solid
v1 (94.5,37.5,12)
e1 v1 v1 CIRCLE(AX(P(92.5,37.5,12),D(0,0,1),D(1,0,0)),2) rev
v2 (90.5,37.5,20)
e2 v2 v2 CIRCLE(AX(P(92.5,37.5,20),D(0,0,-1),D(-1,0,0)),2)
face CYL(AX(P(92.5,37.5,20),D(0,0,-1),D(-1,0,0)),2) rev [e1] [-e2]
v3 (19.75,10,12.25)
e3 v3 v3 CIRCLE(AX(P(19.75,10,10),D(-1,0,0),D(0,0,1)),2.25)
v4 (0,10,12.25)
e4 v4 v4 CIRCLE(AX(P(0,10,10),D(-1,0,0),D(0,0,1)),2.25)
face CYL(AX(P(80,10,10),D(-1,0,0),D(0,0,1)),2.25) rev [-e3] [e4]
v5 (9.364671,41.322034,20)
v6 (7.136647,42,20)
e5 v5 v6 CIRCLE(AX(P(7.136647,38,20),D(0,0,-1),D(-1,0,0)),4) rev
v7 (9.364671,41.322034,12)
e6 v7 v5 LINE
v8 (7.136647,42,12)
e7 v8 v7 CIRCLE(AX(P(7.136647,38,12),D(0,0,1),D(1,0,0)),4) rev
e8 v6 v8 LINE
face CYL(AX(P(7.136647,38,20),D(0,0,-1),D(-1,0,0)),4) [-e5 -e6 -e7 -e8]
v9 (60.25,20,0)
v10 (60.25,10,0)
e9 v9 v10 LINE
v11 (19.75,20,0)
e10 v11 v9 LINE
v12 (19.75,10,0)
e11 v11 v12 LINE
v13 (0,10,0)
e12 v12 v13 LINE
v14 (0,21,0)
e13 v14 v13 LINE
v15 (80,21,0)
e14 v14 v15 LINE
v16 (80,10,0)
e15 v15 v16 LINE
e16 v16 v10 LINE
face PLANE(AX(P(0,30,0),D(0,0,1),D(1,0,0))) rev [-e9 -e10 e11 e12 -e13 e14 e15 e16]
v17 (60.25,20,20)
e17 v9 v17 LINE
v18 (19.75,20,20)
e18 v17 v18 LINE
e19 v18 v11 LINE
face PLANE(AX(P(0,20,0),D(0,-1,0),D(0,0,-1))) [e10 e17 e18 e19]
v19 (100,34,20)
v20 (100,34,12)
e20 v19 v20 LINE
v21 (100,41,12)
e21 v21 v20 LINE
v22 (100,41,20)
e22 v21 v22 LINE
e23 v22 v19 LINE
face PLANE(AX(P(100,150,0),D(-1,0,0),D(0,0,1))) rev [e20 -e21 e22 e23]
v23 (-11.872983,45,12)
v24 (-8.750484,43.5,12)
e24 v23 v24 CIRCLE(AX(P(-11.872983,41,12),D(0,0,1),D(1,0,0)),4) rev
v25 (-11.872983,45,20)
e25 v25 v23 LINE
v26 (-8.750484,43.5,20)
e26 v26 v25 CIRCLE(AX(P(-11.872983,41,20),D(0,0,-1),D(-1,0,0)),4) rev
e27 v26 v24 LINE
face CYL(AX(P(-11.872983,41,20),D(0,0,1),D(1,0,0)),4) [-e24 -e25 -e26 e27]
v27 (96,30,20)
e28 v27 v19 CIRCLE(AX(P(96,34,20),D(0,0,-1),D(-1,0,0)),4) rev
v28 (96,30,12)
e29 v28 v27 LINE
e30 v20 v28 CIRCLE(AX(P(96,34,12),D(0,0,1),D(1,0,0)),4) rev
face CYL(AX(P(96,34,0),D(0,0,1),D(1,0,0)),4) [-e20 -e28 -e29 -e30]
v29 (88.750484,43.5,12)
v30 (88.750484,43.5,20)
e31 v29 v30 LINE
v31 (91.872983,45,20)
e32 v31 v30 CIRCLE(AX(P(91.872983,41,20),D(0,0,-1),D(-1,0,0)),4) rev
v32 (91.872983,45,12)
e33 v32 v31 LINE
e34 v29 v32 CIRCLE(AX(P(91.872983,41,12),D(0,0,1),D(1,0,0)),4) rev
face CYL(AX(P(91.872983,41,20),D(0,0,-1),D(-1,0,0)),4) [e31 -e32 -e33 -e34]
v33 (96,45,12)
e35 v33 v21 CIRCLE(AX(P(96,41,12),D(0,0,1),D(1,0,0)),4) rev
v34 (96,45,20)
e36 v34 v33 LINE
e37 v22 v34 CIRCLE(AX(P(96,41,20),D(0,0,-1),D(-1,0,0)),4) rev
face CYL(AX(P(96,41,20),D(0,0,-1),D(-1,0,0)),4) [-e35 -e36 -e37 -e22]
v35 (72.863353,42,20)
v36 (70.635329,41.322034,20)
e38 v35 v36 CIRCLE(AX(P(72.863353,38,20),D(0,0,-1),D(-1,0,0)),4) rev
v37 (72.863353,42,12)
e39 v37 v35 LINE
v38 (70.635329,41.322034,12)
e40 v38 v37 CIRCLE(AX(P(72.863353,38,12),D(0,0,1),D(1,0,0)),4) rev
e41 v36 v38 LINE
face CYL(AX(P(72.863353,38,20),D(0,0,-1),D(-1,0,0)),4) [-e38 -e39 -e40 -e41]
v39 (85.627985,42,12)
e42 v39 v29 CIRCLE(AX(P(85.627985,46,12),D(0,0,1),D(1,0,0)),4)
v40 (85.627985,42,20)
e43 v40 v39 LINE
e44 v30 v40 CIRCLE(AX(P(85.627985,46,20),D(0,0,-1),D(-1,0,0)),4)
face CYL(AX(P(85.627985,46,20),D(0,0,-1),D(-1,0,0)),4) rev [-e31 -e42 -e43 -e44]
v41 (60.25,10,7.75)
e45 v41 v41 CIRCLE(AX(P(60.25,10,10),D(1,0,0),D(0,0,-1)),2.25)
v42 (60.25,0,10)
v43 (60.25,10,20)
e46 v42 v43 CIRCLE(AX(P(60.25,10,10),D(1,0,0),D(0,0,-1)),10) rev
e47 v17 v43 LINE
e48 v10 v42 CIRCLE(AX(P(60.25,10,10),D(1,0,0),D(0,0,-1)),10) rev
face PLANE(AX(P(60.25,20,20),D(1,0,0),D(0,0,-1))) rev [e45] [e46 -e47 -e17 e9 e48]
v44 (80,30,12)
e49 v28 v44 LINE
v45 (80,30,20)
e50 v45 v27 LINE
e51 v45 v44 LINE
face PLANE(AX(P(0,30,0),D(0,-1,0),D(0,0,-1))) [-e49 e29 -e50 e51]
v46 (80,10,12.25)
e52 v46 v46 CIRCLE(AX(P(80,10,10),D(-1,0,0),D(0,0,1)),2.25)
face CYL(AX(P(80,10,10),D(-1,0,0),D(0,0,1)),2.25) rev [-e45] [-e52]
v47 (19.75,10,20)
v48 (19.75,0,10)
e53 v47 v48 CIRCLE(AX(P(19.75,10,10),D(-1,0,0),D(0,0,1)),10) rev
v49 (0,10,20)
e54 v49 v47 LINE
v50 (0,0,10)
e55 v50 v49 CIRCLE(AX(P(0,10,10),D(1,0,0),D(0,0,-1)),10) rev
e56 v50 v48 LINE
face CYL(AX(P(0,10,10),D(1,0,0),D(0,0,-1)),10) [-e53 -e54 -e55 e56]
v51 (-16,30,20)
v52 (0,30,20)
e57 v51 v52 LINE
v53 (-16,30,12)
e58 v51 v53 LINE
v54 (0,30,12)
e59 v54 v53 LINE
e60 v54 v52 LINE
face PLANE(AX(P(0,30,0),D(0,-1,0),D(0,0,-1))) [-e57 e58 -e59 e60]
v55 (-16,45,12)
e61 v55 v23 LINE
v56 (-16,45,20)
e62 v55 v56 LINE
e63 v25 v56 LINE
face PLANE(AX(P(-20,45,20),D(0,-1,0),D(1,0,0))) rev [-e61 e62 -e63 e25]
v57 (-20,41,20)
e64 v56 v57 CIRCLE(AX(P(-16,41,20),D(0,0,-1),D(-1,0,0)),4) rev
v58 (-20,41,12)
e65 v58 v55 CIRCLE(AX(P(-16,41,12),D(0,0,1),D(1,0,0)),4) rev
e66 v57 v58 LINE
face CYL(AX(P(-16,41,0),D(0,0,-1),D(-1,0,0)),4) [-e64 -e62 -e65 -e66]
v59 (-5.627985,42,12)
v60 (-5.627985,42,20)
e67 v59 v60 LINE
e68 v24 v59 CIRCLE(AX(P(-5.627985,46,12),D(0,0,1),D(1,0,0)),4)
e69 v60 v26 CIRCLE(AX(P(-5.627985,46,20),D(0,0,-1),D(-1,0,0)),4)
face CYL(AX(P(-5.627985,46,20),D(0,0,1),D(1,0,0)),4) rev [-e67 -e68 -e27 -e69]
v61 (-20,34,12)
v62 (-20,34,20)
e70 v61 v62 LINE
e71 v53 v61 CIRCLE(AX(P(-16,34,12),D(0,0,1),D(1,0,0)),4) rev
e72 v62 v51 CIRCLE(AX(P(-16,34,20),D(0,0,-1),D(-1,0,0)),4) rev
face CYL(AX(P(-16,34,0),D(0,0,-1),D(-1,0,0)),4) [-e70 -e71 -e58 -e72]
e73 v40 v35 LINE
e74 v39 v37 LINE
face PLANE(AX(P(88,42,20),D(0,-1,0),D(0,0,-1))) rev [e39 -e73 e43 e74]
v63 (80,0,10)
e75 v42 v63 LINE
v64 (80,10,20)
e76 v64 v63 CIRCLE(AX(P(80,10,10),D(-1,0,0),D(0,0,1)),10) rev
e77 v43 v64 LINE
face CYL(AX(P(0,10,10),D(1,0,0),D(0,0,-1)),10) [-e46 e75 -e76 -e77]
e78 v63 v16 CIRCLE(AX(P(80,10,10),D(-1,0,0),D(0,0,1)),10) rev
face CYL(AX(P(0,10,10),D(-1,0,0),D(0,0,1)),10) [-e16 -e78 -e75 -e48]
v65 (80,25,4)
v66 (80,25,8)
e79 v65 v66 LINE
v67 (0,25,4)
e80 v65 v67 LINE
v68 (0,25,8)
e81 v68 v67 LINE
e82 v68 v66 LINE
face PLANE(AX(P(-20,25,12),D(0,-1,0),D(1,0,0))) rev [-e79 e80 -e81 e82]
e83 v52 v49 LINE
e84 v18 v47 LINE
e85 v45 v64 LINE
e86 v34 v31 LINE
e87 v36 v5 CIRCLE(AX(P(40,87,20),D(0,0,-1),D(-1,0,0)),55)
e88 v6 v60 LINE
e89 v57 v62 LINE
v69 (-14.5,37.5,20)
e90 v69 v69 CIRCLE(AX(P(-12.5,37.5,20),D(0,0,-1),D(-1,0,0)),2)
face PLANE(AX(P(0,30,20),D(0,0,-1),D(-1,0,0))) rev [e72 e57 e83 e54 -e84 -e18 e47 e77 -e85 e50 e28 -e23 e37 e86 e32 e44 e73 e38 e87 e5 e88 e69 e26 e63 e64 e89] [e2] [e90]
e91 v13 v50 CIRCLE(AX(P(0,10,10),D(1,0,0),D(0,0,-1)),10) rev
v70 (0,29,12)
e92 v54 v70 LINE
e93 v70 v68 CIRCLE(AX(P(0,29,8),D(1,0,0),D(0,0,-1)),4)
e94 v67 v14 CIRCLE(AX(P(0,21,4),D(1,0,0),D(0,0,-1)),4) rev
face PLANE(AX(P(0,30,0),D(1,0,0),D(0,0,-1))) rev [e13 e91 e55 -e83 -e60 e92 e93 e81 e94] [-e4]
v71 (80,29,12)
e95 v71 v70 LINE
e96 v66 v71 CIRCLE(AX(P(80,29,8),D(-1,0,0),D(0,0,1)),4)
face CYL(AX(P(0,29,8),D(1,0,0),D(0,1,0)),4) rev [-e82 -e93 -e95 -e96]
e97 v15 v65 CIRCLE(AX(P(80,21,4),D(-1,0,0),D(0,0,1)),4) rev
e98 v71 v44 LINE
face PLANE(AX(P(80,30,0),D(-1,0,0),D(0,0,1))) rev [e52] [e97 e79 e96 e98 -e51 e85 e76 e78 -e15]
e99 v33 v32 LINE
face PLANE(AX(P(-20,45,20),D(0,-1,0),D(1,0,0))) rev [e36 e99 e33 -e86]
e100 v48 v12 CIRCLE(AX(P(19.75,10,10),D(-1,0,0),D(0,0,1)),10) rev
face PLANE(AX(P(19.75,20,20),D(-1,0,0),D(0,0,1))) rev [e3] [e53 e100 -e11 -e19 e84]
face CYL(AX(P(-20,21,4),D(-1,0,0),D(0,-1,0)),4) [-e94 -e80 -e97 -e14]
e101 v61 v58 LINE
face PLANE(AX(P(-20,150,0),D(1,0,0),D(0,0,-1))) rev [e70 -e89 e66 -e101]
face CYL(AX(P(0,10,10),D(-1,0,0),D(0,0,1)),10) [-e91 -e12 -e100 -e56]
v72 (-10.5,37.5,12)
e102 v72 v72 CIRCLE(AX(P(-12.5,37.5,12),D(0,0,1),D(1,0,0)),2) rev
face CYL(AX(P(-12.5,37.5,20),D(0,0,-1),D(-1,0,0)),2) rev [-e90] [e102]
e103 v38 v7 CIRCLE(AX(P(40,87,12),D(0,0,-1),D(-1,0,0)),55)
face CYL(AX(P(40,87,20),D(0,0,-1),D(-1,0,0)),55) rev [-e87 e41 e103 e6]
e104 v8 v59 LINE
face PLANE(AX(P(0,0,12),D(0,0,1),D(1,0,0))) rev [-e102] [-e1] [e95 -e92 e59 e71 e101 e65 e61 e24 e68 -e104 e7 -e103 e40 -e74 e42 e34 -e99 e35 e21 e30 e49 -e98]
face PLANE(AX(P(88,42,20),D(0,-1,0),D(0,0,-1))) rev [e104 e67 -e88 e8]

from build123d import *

# Parameters (mm, degrees)
SKETCH1_W           = 80
SKETCH1_H           = 20
BOSS_EXTRUDE1_DEPTH = 30
SKETCH2_W           = 40.5
SKETCH2_H           = 20
CUT_EXTRUDE1_DEPTH  = 20
SKETCH3_R           = 2.25
CUT_EXTRUDE2_DEPTH  = 88.749643874
FILLET1_R           = 10
SKETCH4_W           = 120
SKETCH4_H           = 20
BOSS_EXTRUDE2_DEPTH = 120
SKETCH7_R           = 2
SKETCH7_W           = 96
SKETCH7_H           = 96
CUT_EXTRUDE5_DEPTH  = 182.383571472
SKETCH8_W           = 120
SKETCH8_H           = 125
CUT_EXTRUDE6_DEPTH  = 12
FILLET2_R           = 4
FILLET3_R           = 4
SKETCH10_W          = 120
SKETCH10_H          = 105
CUT_EXTRUDE7_DEPTH  = 181.676506497
SKETCH11_R          = 55
CUT_EXTRUDE8_DEPTH  = 111.313190508
FILLET6_R           = 4
FILLET7_R           = 4


# Some blends are built 0.0001 mm under size
with BuildPart() as part:
    # Sketch1 → Boss-Extrude1 (new body)
    with BuildSketch(Plane(origin=(0, 0, 0), x_dir=(1, 0, 0), z_dir=(0, 1, 0))):
        with Locations((40, -10)):
            Rectangle(SKETCH1_W, SKETCH1_H)
    extrude(amount=BOSS_EXTRUDE1_DEPTH)

    # Sketch2 → Cut-Extrude1 (cut)
    with BuildSketch(Plane(origin=(0, 0, 0), x_dir=(-1, 0, 0), z_dir=(0, -1, 0))):
        with Locations((-40, -10)):
            Rectangle(SKETCH2_W, SKETCH2_H)
    extrude(amount=-CUT_EXTRUDE1_DEPTH, mode=Mode.SUBTRACT)

    # Sketch3 → Cut-Extrude2 (cut, through all)
    with BuildSketch(Plane.ZY):
        with Locations((10, 10)):
            Circle(SKETCH3_R)
    extrude(amount=-CUT_EXTRUDE2_DEPTH, mode=Mode.SUBTRACT)

    # Fillet1
    fillet1_edges = [part.edges().sort_by_distance(p)[0] for p in [
        (70.125, 0, 20),
        (70.125, 0, 0),
        (9.875, 0, 20),
        (9.875, 0, 0),
    ]]
    fillet(fillet1_edges, radius=FILLET1_R - 0.0001)  # a hair under: the kernel refuses the full size

    # Sketch4 → Boss-Extrude2 (add)
    with BuildSketch(Plane(origin=(0, 30, 0), x_dir=(1, 0, 0), z_dir=(0, 1, 0))):
        with Locations((40, -10)):
            Rectangle(SKETCH4_W, SKETCH4_H)
    extrude(amount=BOSS_EXTRUDE2_DEPTH)

    # Sketch7 → Cut-Extrude5 (cut, through all)
    with BuildSketch(Plane(origin=(0, 0, 0), x_dir=(-1, 0, 0), z_dir=(0, 0, -1))):
        with Locations((-92.5, 37.5)):
            Circle(SKETCH7_R)
        with Locations((12.5, 37.5)):
            Circle(SKETCH7_R)
        with Locations((12.5, 142.5)):
            Circle(SKETCH7_R)
        with Locations((-92.5, 142.5)):
            Circle(SKETCH7_R)
        with Locations((-40, 90)):
            Rectangle(SKETCH7_W, SKETCH7_H)
    extrude(amount=-CUT_EXTRUDE5_DEPTH, mode=Mode.SUBTRACT)

    # Sketch8 → Cut-Extrude6 (cut)
    with BuildSketch(Plane(origin=(0, 0, 0), x_dir=(-1, 0, 0), z_dir=(0, 0, -1))):
        with Locations((-40, 87.5)):
            Rectangle(SKETCH8_W, SKETCH8_H)
    extrude(amount=-CUT_EXTRUDE6_DEPTH, mode=Mode.SUBTRACT)

    # Fillet2
    fillet2_edges = [part.edges().sort_by_distance(p)[0] for p in [
        (40, 25, 12),
    ]]
    fillet(fillet2_edges, radius=FILLET2_R)

    # Fillet3
    fillet3_edges = [part.edges().sort_by_distance(p)[0] for p in [
        (40, 25, 0),
    ]]
    fillet(fillet3_edges, radius=FILLET3_R)

    # Sketch10 → Cut-Extrude7 (cut, through all)
    with BuildSketch(Plane(origin=(0, 0, 12), x_dir=(-1, 0, 0), z_dir=(0, 0, -1))):
        with Locations((-40, 97.5)):
            Rectangle(SKETCH10_W, SKETCH10_H)
    extrude(amount=-CUT_EXTRUDE7_DEPTH, mode=Mode.SUBTRACT)

    # Sketch11 → Cut-Extrude8 (cut, through all)
    with BuildSketch(Plane(origin=(0, 0, 12), x_dir=(-1, 0, 0), z_dir=(0, 0, -1))):
        with Locations((-40, 87)):
            Circle(SKETCH11_R)
    extrude(amount=-CUT_EXTRUDE8_DEPTH, mode=Mode.SUBTRACT)

    # Fillet6
    # the kernel refuses this fillet: 4 mm, written as the material it takes off along each edge
    with BuildSketch(Plane(origin=(-20, 30, 2), x_dir=(0, 1, 0), z_dir=(0, 0, 1)), Plane(origin=(100, 45, 2), x_dir=(0, -1, 0), z_dir=(0, 0, 1)), Plane(origin=(-20, 45, 2), x_dir=(1, 0, 0), z_dir=(0, 0, 1))) as fillet6_piece_1:
        with BuildLine():
            CenterArc((FILLET6_R, -FILLET6_R), FILLET6_R, 90, 90)
            Line((0, -FILLET6_R), (-FILLET6_R * 0.02, -FILLET6_R))
            Line((-FILLET6_R * 0.02, -FILLET6_R), (-FILLET6_R * 0.02, FILLET6_R * 0.02))
            Line((-FILLET6_R * 0.02, FILLET6_R * 0.02), (FILLET6_R, FILLET6_R * 0.02))
            Line((FILLET6_R, FILLET6_R * 0.02), (FILLET6_R, 0))
        make_face()
    extrude(amount=28, mode=Mode.SUBTRACT)
    with BuildSketch(Plane(origin=(100, 30, 30), x_dir=(-1, 0, 0), z_dir=(0, 0, -1))) as fillet6_piece_2:
        with BuildLine():
            CenterArc((FILLET6_R, FILLET6_R), FILLET6_R, 180, 90)
            Line((0, FILLET6_R), (-FILLET6_R * 0.02, FILLET6_R))
            Line((-FILLET6_R * 0.02, FILLET6_R), (-FILLET6_R * 0.02, -FILLET6_R * 0.02))
            Line((-FILLET6_R * 0.02, -FILLET6_R * 0.02), (FILLET6_R, -FILLET6_R * 0.02))
            Line((FILLET6_R, -FILLET6_R * 0.02), (FILLET6_R, 0))
        make_face()
    extrude(amount=28, mode=Mode.SUBTRACT)
    with BuildSketch(Plane(origin=(88, 45, 29.682458366), x_dir=(1, 0, 0), z_dir=(0, 0, -1))) as fillet6_piece_3:
        with BuildLine():
            CenterArc((3.872983346, 4), FILLET6_R, 194.477512186, 75.522487814)
            Line((0, 3), (-0.077459667, 2.98))
            ThreePointArc((-0.077459667, 2.98), (-0.08, 1.5), (-0.08, 0))
            Line((-0.08, 0), (0, -0.08))
            Line((0, -0.08), (3.872983346, -0.08))
            Line((3.872983346, -0.08), (3.872983346, 0))
        make_face()
    extrude(amount=27.364916731, mode=Mode.SUBTRACT)
    with BuildSketch(Plane(origin=(71.622776602, 42, 23.101442122), x_dir=(1, 0, 0), z_dir=(0, 0, -1))) as fillet6_piece_4:
        with BuildLine():
            CenterArc((1.240576849, 4), FILLET6_R, 236.151006115, 33.848993885)
            Line((-0.987447114, 0.677966102), (-1.032007593, 0.611525424))
            ThreePointArc((-1.032007593, 0.611525424), (-0.537159223, 0.275719676), (-0.045996766, -0.065454545))
            Line((-0.045996766, -0.065454545), (0, -0.08))
            Line((0, -0.08), (1.240576849, -0.08))
            Line((1.240576849, -0.08), (1.240576849, 0))
        make_face()
    extrude(amount=14.202884243, mode=Mode.SUBTRACT)
    with BuildSketch(Plane(origin=(8.377223398, 42, 23.101442122), x_dir=(0.8243940217834806, -0.5660163397355751, 0), z_dir=(0, 0, -1))) as fillet6_piece_5:
        with BuildLine():
            CenterArc((1.241341221, 3.999762854), FILLET6_R, 235.527102444, 33.848993885)
            Line((-1.022724138, 0.702186767), (-1.068005445, 0.636235245))
            Line((-1.068005445, 0.636235245), (-0.045281307, -0.065951522))
            Line((-0.045281307, -0.065951522), (0.000871117, -0.079995257))
            ThreePointArc((0.000871117, -0.079995257), (0.598892695, -0.076739245), (1.196914272, -0.079995257))
            Line((1.196914272, -0.079995257), (1.197785389, 0))
        make_face()
    extrude(amount=14.202884243, mode=Mode.SUBTRACT)
    with BuildSketch(Plane(origin=(-8, 45, 2.317541634), x_dir=(0, -1, 0), z_dir=(0, 0, 1))) as fillet6_piece_6:
        with BuildLine():
            CenterArc((4, -3.872983346), FILLET6_R, 104.477512186, 75.522487814)
            Line((0, -3.872983346), (-0.08, -3.872983346))
            Line((-0.08, -3.872983346), (-0.08, 0))
            Line((-0.08, 0), (0, 0.08))
            ThreePointArc((0, 0.08), (1.5, 0.08), (2.98, 0.077459667))
            Line((2.98, 0.077459667), (3, 0))
        make_face()
    extrude(amount=27.364916731, mode=Mode.SUBTRACT)

    # Fillet7
    fillet7_edges = [part.edges().sort_by_distance(p)[0] for p in [
        (88, 42, 16),
        (-8, 42, 16),
    ]]
    fillet(fillet7_edges, radius=FILLET7_R)


solid = part.part
